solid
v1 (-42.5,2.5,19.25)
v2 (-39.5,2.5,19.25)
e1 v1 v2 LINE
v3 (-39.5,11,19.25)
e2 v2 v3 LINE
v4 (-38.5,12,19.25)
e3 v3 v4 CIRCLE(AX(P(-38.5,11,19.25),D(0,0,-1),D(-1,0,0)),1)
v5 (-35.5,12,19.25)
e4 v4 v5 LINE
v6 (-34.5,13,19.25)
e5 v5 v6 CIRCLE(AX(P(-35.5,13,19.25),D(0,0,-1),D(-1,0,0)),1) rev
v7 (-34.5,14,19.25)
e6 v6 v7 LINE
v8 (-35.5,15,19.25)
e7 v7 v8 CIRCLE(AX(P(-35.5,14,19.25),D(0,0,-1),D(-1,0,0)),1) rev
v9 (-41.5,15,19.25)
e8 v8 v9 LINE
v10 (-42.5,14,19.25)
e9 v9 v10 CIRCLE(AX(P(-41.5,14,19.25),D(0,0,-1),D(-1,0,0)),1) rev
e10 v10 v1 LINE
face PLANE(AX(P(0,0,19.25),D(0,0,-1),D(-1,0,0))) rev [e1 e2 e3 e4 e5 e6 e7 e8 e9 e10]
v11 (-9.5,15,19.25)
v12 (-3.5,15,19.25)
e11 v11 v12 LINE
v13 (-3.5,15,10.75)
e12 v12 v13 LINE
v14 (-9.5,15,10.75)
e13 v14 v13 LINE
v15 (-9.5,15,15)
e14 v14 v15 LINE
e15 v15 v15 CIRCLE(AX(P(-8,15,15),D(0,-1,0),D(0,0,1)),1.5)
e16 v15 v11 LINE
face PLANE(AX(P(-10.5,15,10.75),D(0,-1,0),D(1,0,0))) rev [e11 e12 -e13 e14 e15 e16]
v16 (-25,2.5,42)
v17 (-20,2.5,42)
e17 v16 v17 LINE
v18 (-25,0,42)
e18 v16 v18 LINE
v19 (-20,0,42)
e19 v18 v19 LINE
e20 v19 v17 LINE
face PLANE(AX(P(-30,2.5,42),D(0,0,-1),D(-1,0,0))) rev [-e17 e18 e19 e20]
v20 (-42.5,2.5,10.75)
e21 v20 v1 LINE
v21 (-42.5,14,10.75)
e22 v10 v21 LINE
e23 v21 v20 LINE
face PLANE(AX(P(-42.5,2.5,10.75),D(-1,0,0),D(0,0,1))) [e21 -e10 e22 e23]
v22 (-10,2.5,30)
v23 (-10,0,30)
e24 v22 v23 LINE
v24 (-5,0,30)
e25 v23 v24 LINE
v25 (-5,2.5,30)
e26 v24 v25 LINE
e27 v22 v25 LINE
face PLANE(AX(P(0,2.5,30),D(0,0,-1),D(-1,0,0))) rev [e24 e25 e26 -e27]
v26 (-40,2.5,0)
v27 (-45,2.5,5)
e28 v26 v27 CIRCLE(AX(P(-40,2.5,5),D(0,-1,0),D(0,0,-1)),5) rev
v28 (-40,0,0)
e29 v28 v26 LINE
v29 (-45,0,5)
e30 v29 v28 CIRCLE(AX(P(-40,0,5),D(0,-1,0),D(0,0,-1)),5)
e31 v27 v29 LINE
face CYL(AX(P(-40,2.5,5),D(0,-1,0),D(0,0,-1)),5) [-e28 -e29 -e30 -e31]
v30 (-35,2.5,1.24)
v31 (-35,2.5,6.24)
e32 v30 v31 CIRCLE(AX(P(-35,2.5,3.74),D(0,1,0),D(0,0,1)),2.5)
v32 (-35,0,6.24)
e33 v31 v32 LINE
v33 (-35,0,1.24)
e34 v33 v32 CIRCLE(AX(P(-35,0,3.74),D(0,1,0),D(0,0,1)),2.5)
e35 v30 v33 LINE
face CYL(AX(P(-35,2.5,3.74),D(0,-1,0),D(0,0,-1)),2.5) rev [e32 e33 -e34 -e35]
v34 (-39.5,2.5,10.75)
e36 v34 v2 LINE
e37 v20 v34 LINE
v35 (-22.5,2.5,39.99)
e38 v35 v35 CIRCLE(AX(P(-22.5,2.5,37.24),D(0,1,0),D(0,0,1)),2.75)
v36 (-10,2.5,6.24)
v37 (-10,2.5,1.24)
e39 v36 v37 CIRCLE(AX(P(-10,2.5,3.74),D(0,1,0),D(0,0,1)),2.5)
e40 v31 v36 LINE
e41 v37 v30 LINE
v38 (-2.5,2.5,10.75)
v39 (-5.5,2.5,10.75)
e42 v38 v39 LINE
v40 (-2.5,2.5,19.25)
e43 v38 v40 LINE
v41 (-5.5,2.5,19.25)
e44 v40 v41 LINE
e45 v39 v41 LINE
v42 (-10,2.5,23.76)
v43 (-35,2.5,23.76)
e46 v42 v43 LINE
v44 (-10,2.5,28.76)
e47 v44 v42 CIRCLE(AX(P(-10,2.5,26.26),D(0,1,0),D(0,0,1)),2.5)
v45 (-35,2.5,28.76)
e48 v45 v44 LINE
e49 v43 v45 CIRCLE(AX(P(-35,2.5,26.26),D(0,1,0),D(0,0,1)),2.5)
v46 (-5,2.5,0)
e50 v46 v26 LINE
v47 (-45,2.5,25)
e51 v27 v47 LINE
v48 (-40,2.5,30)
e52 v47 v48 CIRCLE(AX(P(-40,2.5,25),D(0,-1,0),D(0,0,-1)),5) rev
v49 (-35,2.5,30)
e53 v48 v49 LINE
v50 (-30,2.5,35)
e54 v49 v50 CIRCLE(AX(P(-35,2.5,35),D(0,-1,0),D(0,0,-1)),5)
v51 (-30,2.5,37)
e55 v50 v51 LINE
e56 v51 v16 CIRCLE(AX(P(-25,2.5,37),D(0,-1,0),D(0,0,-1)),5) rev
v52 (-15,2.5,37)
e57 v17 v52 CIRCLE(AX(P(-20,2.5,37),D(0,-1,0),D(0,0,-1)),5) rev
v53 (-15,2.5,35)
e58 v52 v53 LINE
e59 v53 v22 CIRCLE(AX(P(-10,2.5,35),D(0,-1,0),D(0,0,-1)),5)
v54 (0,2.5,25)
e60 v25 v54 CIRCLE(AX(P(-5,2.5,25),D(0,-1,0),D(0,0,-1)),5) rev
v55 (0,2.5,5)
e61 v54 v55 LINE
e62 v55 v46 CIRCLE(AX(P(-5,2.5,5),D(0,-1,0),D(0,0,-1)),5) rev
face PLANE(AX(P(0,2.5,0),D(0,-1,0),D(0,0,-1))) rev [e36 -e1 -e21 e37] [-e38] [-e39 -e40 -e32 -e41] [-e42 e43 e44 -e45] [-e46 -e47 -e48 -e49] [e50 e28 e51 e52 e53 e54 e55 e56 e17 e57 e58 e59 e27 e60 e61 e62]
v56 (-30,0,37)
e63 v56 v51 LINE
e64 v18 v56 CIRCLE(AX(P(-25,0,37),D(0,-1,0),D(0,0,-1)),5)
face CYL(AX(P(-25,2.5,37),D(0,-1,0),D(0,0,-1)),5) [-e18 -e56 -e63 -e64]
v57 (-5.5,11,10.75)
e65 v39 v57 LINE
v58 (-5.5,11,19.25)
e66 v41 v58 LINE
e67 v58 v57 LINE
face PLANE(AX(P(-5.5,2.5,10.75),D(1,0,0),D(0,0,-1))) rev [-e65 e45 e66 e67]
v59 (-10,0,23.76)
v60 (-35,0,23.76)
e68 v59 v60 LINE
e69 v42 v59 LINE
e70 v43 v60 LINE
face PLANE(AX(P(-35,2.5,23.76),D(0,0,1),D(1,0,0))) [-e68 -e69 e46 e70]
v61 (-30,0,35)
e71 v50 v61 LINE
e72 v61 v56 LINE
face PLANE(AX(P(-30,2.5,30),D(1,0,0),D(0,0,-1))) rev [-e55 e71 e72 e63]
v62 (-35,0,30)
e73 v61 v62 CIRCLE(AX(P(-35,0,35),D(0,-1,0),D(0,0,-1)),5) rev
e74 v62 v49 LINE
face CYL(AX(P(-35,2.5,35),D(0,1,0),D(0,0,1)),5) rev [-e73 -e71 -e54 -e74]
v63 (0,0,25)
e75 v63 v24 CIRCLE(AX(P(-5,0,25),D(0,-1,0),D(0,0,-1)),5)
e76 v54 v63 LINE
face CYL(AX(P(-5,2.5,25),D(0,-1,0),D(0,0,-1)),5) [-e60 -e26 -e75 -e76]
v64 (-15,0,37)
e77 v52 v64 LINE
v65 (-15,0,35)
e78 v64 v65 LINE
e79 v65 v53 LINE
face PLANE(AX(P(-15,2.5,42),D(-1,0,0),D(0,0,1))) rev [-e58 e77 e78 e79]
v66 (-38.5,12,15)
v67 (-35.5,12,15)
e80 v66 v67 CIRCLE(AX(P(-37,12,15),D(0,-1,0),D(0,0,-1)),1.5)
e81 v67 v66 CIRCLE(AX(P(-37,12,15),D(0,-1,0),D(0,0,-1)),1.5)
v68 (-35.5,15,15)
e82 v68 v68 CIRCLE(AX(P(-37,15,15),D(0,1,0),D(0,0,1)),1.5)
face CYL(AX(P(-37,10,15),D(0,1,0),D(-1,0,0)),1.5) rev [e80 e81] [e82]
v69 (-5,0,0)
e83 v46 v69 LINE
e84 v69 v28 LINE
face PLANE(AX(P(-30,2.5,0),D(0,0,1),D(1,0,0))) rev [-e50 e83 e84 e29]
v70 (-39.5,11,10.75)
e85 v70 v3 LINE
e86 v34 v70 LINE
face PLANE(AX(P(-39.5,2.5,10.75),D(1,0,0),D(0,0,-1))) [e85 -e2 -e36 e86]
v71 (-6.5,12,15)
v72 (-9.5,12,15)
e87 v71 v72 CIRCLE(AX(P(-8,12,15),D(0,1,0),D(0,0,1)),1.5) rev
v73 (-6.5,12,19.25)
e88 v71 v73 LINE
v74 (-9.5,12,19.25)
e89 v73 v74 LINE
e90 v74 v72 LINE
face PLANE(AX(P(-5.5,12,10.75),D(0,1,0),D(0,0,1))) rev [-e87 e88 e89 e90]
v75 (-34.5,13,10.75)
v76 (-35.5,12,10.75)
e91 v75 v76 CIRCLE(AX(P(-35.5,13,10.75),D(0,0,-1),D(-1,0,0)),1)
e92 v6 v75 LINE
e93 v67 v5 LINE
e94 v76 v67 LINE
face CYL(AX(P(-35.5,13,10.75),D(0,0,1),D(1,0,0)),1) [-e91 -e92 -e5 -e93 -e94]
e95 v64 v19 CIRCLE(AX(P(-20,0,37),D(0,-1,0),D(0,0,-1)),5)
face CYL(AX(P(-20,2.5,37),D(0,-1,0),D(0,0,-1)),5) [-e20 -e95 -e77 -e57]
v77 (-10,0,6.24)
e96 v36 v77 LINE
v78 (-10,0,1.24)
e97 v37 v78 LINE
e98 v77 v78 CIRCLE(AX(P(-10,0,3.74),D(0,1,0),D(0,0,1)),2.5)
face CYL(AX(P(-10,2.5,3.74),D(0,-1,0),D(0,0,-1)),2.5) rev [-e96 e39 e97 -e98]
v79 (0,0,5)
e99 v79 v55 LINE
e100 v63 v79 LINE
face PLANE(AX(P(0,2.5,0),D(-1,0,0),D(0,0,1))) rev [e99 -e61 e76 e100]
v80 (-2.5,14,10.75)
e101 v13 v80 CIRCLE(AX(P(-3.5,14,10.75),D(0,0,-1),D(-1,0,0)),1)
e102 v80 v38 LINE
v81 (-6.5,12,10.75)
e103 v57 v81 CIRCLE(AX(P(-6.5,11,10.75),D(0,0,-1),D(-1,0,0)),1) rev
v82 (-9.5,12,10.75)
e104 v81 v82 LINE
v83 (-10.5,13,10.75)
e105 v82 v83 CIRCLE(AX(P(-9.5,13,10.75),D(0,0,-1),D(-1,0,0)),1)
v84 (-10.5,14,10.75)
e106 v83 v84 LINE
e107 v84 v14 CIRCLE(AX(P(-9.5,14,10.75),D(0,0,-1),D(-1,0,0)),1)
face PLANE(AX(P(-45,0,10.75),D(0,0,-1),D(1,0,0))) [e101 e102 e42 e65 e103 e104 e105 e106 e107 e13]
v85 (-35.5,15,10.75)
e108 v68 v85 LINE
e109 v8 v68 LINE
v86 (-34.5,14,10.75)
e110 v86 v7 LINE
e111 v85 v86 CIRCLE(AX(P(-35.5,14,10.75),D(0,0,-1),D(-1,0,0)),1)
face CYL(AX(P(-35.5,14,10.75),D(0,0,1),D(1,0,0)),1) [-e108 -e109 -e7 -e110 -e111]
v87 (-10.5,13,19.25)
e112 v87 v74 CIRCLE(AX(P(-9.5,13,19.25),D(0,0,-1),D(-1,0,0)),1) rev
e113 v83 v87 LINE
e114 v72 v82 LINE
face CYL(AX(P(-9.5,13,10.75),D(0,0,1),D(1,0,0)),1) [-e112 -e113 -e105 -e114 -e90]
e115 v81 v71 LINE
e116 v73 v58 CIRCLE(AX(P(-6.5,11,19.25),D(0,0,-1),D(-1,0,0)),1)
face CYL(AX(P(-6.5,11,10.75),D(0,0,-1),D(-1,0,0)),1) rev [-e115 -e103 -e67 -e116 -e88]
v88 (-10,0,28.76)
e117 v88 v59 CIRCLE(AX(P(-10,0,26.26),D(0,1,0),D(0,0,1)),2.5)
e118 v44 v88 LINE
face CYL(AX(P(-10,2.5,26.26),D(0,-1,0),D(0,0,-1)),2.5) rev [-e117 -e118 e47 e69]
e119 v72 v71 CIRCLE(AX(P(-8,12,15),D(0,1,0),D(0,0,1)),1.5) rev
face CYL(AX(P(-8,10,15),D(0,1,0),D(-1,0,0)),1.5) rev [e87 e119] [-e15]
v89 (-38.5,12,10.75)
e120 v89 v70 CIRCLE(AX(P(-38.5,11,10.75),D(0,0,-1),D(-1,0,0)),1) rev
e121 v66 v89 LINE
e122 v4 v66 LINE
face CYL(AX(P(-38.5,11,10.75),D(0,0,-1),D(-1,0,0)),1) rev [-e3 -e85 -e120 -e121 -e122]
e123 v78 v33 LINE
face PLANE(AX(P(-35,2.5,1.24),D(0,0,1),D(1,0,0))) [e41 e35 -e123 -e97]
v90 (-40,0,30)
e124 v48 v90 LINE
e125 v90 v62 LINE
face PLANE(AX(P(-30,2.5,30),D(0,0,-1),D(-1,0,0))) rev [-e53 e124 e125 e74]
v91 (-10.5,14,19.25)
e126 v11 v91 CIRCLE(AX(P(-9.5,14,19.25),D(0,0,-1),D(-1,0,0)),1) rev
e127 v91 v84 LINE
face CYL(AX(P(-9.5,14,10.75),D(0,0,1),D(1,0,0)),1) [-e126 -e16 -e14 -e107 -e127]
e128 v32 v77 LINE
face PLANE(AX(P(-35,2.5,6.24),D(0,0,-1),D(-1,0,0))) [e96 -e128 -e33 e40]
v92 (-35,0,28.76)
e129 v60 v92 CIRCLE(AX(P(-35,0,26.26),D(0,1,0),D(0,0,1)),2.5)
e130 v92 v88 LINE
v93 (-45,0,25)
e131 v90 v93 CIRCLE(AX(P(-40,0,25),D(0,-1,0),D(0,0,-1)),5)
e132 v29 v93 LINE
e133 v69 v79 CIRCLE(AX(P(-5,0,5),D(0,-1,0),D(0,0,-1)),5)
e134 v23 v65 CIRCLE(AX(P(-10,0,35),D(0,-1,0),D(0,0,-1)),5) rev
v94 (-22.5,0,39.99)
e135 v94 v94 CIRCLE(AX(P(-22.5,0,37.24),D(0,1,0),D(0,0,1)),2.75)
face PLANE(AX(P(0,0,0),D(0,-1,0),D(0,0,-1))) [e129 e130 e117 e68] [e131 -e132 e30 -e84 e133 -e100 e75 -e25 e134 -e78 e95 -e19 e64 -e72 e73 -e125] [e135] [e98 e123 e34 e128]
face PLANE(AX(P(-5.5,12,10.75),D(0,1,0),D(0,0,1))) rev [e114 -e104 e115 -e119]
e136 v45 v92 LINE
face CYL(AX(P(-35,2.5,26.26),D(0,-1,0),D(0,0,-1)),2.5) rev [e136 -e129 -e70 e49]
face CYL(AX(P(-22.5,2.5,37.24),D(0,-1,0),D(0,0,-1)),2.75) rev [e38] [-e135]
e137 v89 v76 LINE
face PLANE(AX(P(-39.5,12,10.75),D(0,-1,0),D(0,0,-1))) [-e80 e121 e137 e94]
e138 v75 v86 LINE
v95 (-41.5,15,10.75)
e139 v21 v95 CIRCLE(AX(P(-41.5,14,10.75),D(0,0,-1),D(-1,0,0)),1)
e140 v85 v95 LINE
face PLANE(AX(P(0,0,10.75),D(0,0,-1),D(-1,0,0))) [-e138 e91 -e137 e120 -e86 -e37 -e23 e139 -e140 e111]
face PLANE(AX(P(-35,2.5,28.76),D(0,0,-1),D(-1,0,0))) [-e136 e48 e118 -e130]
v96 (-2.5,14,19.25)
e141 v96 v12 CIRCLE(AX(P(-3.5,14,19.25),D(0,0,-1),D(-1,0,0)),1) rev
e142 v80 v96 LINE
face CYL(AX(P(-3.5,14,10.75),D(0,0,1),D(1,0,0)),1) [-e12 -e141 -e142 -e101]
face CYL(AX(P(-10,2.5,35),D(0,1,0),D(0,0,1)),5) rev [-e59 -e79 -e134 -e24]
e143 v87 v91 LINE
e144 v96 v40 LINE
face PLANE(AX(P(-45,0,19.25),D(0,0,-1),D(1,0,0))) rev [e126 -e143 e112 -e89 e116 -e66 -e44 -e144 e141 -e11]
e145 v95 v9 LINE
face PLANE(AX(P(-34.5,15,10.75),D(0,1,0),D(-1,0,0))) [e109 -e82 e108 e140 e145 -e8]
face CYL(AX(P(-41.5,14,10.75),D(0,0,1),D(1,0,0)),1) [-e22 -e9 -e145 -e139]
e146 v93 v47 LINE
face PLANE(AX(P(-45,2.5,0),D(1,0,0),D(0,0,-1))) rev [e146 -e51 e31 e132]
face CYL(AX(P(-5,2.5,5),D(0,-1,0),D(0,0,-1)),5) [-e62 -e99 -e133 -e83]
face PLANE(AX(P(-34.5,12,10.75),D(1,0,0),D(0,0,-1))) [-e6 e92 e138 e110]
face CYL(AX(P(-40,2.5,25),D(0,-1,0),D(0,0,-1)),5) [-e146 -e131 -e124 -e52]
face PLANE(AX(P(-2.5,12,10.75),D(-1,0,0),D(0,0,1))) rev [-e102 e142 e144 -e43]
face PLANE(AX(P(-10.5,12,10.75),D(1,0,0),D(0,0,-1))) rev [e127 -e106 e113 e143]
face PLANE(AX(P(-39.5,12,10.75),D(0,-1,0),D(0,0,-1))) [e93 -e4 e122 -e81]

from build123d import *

# Parameters (mm, degrees)
SKETCH1_R            = 2.7499999999999987
BOSS_EXTRUDE1_DEPTH  = 2.5
BOSS_EXTRUDE3_DEPTH  = 4.25
SKETCH5_R            = 1.4999999999999967
CUT_EXTRUDE1_DEPTH   = 5
FILLET1_R            = 1
FILLET2_R            = 1
FILLET3_R            = 1
FILLET4_R            = 1
FILLET1_OF_MIRROR1_R = 1
FILLET2_OF_MIRROR1_R = 1
FILLET3_OF_MIRROR1_R = 1
FILLET4_OF_MIRROR1_R = 1
FILLET5_R            = 5
FILLET6_R            = 5


with BuildPart() as part:
    # Sketch1 → Boss-Extrude1 (new body)
    with BuildSketch(Plane(origin=(0, 0, 0), x_dir=(1, 0, 0), z_dir=(0, 1, 0))):
        Polygon((0, 0), (-30, 0), (-45, -5.51e-15), (-45, -30), (-29.999999999999996, -30), (-30, -42), (-15, -42), (-15, -30.000000000000004), (0, -30), align=None)
        with Locations(Location((-22.5, -37.239999999999995, 0), (0, 0, 270))):
            Circle(SKETCH1_R, mode=Mode.SUBTRACT)
        with BuildLine():
            Line((-34.99999999999999, -1.239999999999998), (-10.000000000000002, -1.240000000000011))
            ThreePointArc((-10.000000000000002, -1.240000000000011), (-7.500000000000012, -3.7400000000000007), (-10.000000000000002, -6.2399999999999896))
            Line((-10.000000000000002, -6.2399999999999896), (-34.99999999999999, -6.240000000000009))
            ThreePointArc((-34.99999999999999, -6.240000000000009), (-37.5, -3.7400000000000015), (-34.99999999999999, -1.239999999999998))
        make_face(mode=Mode.SUBTRACT)
        with BuildLine():
            Line((-34.99999999999999, -23.75999999999999), (-10.000000000000002, -23.76000000000001))
            ThreePointArc((-10.000000000000002, -23.76000000000001), (-7.500000000000012, -26.259999999999998), (-10.000000000000002, -28.759999999999987))
            Line((-10.000000000000002, -28.759999999999987), (-34.99999999999999, -28.76))
            ThreePointArc((-34.99999999999999, -28.76), (-37.5, -26.259999999999998), (-34.99999999999999, -23.75999999999999))
        make_face(mode=Mode.SUBTRACT)
    extrude(amount=BOSS_EXTRUDE1_DEPTH)

    # Sketch3 → Boss-Extrude3 (add, symmetric)
    with BuildSketch(Plane.XY.offset(14.999999999999995)):
        Polygon((-39.5, 2.5), (-42.5, 2.5000000000000004), (-42.5, 12), (-42.5, 15.000000000000007), (-34.5, 15.000000000000004), (-34.5, 12), (-39.5, 12), align=None)
    boss_extrude3 = extrude(amount=BOSS_EXTRUDE3_DEPTH, both=True)

    # Sketch5 → Cut-Extrude1 (cut)
    with BuildSketch(Plane(origin=(6.51e-15, 14.999999999999988, 0), x_dir=(1, 0, 0), z_dir=(0, 1, 0))):
        with Locations(Location((-36.99999999999999, -15, 0), (0, 0, 270))):
            Circle(SKETCH5_R)
    cut_extrude1 = extrude(amount=-CUT_EXTRUDE1_DEPTH, mode=Mode.SUBTRACT)

    # Fillet1
    fillet1_edges = [part.edges().sort_by_distance(p)[0] for p in [
        (-39.49999999999999, 12, 14.999999999999993),
    ]]
    fillet(fillet1_edges, radius=FILLET1_R)

    # Fillet2
    fillet2_edges = [part.edges().sort_by_distance(p)[0] for p in [
        (-34.49999999999999, 12, 14.999999999999993),
    ]]
    fillet(fillet2_edges, radius=FILLET2_R - 0.0001)  # a hair under: the kernel refuses the full size

    # Fillet3
    fillet3_edges = [part.edges().sort_by_distance(p)[0] for p in [
        (-34.49999999999999, 15.000000000000004, 14.999999999999993),
    ]]
    fillet(fillet3_edges, radius=FILLET3_R - 0.0001)  # a hair under: the kernel refuses the full size

    # Fillet4
    fillet4_edges = [part.edges().sort_by_distance(p)[0] for p in [
        (-42.49999999999999, 15.000000000000007, 14.999999999999993),
    ]]
    fillet(fillet4_edges, radius=FILLET4_R)

    # Mirror1: Boss-Extrude3, Cut-Extrude1 across plane
    add(boss_extrude3.mirror(Plane(origin=(-22.5, 0, 0), x_dir=(6e-17, 0, 1), z_dir=(1, 0, -6e-17))))
    add(cut_extrude1.mirror(Plane(origin=(-22.5, 0, 0), x_dir=(6e-17, 0, 1), z_dir=(1, 0, -6e-17))), mode=Mode.SUBTRACT)

    # Fillet1 of Mirror1
    fillet1_of_mirror1_edges = [part.edges().sort_by_distance(p)[0] for p in [
        (-5.500000000000007, 12, 14.999999999999991),
    ]]
    fillet(fillet1_of_mirror1_edges, radius=FILLET1_OF_MIRROR1_R)

    # Fillet2 of Mirror1
    fillet2_of_mirror1_edges = [part.edges().sort_by_distance(p)[0] for p in [
        (-10.500000000000007, 12, 14.999999999999993),
    ]]
    fillet(fillet2_of_mirror1_edges, radius=FILLET2_OF_MIRROR1_R - 0.0001)  # a hair under: the kernel refuses the full size

    # Fillet3 of Mirror1
    fillet3_of_mirror1_edges = [part.edges().sort_by_distance(p)[0] for p in [
        (-10.500000000000007, 15.000000000000004, 14.999999999999993),
    ]]
    fillet(fillet3_of_mirror1_edges, radius=FILLET3_OF_MIRROR1_R - 0.0001)  # a hair under: the kernel refuses the full size

    # Fillet4 of Mirror1
    fillet4_of_mirror1_edges = [part.edges().sort_by_distance(p)[0] for p in [
        (-2.500000000000007, 15.000000000000007, 14.999999999999991),
    ]]
    fillet(fillet4_of_mirror1_edges, radius=FILLET4_OF_MIRROR1_R)

    # Fillet5
    fillet5_edges = [part.edges().sort_by_distance(p)[0] for p in [
        (-15, 1.25, 30.000000000000004),
        (-29.999999999999996, 1.25, 30),
    ]]
    fillet(fillet5_edges, radius=FILLET5_R)

    # Fillet6
    fillet6_edges = [part.edges().sort_by_distance(p)[0] for p in [
        (0, 1.25, 30),
        (-15, 1.25, 42),
        (-30, 1.25, 42),
        (-45, 1.25, 30),
        (-45, 1.25, 5.51e-15),
        (0, 1.25, 0),
    ]]
    fillet(fillet6_edges, radius=FILLET6_R)


solid = part.part
